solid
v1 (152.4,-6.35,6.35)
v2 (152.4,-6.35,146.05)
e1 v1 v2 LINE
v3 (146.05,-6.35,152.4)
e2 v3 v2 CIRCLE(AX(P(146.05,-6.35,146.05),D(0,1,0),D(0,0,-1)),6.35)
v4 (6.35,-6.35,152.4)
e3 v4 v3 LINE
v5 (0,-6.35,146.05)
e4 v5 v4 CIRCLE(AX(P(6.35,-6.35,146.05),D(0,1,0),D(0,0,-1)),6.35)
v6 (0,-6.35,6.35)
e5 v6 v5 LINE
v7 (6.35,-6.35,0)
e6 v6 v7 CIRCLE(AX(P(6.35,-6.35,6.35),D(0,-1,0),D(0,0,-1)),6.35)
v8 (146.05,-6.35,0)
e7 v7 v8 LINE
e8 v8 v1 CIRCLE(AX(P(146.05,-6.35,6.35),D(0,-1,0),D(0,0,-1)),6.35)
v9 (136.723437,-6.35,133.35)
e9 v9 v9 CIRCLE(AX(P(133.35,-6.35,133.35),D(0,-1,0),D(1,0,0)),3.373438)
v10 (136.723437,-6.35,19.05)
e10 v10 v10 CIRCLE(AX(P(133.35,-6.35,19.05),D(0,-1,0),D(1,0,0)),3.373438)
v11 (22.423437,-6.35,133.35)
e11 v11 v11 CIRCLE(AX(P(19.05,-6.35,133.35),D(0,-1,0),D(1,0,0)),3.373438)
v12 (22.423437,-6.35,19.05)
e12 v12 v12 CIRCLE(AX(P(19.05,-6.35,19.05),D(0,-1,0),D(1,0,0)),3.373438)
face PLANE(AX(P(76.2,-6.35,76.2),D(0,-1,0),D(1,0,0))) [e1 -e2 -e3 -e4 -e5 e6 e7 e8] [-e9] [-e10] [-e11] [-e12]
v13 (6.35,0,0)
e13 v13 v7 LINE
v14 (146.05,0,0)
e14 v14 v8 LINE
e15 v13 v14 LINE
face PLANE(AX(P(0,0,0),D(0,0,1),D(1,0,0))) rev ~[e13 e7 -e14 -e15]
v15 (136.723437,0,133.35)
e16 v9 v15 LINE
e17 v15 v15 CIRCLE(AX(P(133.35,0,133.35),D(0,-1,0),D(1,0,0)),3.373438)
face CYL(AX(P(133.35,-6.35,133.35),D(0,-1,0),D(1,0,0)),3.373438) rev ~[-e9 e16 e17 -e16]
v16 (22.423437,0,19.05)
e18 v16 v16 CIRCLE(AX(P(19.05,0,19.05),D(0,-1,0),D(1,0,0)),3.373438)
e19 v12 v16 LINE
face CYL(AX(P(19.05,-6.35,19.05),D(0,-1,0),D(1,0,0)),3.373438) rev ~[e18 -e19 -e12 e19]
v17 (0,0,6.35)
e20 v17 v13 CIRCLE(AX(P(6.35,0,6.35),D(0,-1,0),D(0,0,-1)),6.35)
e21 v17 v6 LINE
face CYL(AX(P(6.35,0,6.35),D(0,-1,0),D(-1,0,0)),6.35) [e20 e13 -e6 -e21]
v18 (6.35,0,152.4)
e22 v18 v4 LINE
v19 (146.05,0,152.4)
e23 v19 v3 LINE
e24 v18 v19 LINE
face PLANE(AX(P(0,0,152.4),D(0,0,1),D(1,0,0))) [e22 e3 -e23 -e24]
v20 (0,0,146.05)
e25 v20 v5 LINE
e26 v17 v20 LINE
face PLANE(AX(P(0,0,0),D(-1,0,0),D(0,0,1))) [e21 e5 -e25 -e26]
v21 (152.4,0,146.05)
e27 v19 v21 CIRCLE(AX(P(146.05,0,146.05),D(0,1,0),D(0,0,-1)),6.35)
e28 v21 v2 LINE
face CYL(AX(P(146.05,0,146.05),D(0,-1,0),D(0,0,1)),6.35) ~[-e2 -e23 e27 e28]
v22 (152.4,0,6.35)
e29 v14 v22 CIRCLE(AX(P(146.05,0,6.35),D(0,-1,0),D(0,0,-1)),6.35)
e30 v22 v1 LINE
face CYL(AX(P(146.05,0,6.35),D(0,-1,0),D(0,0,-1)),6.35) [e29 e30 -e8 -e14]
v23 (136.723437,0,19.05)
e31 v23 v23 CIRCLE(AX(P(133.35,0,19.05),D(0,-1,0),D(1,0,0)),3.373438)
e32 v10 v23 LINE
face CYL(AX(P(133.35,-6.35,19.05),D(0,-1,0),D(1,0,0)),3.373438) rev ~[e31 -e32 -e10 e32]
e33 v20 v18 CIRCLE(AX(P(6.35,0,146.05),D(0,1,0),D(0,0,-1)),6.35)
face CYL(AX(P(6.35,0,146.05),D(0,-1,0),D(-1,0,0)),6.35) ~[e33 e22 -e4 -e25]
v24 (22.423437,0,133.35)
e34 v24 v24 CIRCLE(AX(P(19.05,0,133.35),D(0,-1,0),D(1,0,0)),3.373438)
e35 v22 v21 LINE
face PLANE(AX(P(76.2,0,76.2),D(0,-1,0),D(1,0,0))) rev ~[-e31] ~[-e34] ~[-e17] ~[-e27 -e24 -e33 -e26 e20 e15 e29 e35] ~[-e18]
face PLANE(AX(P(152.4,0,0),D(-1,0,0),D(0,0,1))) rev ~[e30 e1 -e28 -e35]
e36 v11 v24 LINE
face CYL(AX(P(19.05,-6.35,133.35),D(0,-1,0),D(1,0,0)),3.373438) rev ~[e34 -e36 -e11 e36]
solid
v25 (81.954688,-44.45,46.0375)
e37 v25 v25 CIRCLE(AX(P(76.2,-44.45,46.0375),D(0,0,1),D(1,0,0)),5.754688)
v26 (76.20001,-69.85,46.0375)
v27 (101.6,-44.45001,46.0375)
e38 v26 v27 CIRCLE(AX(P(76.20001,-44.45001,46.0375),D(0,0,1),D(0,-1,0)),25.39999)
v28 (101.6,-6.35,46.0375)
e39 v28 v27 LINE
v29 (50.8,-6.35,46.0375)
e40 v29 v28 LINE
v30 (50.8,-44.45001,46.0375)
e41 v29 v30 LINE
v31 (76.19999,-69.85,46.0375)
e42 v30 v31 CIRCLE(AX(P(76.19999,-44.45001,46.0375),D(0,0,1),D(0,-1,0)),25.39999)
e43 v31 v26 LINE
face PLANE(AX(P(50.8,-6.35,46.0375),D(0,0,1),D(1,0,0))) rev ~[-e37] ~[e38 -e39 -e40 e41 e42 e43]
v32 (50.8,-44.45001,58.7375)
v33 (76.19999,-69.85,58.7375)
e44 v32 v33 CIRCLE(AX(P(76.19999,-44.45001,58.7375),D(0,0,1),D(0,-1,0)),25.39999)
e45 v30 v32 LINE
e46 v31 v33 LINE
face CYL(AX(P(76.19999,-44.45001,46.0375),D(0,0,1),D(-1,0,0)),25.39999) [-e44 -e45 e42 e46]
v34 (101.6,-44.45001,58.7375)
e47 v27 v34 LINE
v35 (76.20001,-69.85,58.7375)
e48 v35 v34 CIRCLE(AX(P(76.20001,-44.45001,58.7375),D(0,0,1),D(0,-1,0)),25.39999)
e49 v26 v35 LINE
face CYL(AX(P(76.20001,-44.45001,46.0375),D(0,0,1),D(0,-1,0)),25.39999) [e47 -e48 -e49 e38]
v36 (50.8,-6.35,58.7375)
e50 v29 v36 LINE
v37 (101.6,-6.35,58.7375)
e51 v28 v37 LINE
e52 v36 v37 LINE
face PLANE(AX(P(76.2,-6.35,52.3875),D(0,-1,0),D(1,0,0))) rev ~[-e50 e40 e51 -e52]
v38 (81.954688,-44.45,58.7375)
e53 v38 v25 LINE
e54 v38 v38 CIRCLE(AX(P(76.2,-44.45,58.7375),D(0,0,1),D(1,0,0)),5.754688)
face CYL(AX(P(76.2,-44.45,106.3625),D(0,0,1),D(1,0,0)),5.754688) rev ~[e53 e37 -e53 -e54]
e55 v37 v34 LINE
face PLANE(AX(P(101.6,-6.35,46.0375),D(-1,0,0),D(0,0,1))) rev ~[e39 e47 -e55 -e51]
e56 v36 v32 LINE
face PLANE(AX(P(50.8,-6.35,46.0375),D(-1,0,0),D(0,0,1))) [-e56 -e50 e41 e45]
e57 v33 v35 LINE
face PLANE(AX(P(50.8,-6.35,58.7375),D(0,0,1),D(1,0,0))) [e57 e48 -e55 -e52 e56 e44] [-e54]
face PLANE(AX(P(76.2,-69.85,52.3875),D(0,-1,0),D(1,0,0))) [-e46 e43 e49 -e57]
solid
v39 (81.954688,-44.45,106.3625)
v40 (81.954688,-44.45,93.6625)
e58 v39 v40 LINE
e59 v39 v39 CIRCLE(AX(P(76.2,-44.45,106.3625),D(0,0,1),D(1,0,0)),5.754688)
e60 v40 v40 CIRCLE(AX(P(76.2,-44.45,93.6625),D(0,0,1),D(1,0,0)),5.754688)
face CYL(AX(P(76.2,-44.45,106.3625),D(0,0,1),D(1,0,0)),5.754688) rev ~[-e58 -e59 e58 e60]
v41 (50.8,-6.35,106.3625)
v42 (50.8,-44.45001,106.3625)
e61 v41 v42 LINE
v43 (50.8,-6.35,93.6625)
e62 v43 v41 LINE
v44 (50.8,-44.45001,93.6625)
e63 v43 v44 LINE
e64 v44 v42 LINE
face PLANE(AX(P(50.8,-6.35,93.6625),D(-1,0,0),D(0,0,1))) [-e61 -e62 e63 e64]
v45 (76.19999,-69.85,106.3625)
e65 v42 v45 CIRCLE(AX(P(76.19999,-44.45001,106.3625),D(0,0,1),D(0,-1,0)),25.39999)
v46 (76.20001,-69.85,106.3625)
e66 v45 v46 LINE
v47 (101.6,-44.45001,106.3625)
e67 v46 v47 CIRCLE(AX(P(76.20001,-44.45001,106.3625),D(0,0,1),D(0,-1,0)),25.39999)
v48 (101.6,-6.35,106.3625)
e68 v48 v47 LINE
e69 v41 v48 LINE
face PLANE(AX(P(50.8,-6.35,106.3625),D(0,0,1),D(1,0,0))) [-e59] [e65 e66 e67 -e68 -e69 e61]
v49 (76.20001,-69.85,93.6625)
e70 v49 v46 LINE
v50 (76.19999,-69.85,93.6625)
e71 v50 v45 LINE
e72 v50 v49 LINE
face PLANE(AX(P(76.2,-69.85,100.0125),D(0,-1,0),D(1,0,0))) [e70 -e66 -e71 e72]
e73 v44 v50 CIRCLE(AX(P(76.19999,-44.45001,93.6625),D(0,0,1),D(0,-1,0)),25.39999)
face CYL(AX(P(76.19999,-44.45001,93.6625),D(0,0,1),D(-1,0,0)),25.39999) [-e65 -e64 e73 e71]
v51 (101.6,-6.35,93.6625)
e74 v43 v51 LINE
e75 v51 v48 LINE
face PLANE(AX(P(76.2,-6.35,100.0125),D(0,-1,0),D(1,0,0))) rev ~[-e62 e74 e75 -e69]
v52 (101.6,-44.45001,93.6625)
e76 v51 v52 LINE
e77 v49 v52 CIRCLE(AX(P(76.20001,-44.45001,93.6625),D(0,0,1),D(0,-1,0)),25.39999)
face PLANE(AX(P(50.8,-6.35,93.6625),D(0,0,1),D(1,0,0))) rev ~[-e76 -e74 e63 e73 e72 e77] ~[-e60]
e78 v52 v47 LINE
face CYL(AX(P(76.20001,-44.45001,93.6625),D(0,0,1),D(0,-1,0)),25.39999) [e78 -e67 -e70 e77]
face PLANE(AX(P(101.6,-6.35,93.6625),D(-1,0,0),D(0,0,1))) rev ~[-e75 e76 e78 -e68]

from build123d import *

# Parameters (mm, degrees)
F0_W     = 152.4
F0_H     = 152.4
F1_DEPTH = 6.35
F2_W     = 50.8
F2_H     = 12.7
F3_DEPTH = 63.5
F4_R     = 5.7546875
F5_DEPTH = 76.2
F6_R     = 3.3734375
F7_DEPTH = 6.35
F8_R     = 25.39999
F8_2_R   = 25.39999
F9_R     = 6.35


# Not quite as in the source:
# - a fillet or chamfer is up to 0.001 mm smaller than in the source, because OpenCascade refuses the exact size


with BuildPart() as f1:
    # F0 (on Front) → F1 (new body)
    with BuildSketch(Plane.XZ):
        with Locations((76.2, 76.2)):
            Rectangle(F0_W, F0_H)
    extrude(amount=F1_DEPTH)

    # F6 (on face) → F7 (cut)
    with BuildSketch(Plane.XZ.offset(6.35)):
        with Locations((19.05, 133.35)):
            Circle(F6_R)
        with Locations((133.35, 133.35)):
            Circle(F6_R)
        with Locations((19.05, 19.05)):
            Circle(F6_R)
        with Locations((133.35, 19.05)):
            Circle(F6_R)
    extrude(amount=-F7_DEPTH, mode=Mode.SUBTRACT)

    # F9
    f9_edges = [f1.edges().sort_by_distance(p)[0] for p in [
        (0, -3.175, 152.4),
        (152.4, -3.175, 152.4),
        (0, -3.175, 0),
        (152.4, -3.175, 0),
    ]]
    fillet(f9_edges, radius=F9_R)


with BuildPart() as f3:
    # F2 (on face) → F3 (new body)
    with BuildSketch(Plane.XZ.offset(6.35)):
        with Locations((76.2, 100.0125)):
            Rectangle(F2_W, F2_H)
    extrude(amount=F3_DEPTH)


with BuildPart() as f3b:
    # F2 (on face) → F3, piece 2 (new body)
    with BuildSketch(Plane.XZ.offset(6.35)):
        with Locations((76.2, 52.3875)):
            Rectangle(F2_W, F2_H)
    extrude(amount=F3_DEPTH)


with BuildPart() as f5_tool:
    # F4 (on face) → F5 (new body)
    with BuildSketch(Plane.XY.offset(106.3625)):
        with Locations((76.2, -44.45)):
            Circle(F4_R)
    extrude(amount=-F5_DEPTH)


with BuildPart() as f3_1:
    add(f3.part)

    # F5: cut by f5_tool
    add(f5_tool.part, mode=Mode.SUBTRACT)

    # F8 (radius 25.4 in the source; OpenCascade refuses exactly that, so slightly less here)
    f8_edges = [f3_1.edges().sort_by_distance(p)[0] for p in [
        (50.8, -69.85, 100.0125),
        (101.6, -69.85, 100.0125),
    ]]
    fillet(f8_edges, radius=F8_R)


with BuildPart() as f3b_1:
    add(f3b.part)

    # F5: cut by f5_tool
    add(f5_tool.part, mode=Mode.SUBTRACT)

    # F8#2 (radius 25.4 in the source; OpenCascade refuses exactly that, so slightly less here)
    f8_2_edges = [f3b_1.edges().sort_by_distance(p)[0] for p in [
        (50.8, -69.85, 52.3875),
        (101.6, -69.85, 52.3875),
    ]]
    fillet(f8_2_edges, radius=F8_2_R)


solid = Compound([f1.part, f3_1.part, f3b_1.part])
